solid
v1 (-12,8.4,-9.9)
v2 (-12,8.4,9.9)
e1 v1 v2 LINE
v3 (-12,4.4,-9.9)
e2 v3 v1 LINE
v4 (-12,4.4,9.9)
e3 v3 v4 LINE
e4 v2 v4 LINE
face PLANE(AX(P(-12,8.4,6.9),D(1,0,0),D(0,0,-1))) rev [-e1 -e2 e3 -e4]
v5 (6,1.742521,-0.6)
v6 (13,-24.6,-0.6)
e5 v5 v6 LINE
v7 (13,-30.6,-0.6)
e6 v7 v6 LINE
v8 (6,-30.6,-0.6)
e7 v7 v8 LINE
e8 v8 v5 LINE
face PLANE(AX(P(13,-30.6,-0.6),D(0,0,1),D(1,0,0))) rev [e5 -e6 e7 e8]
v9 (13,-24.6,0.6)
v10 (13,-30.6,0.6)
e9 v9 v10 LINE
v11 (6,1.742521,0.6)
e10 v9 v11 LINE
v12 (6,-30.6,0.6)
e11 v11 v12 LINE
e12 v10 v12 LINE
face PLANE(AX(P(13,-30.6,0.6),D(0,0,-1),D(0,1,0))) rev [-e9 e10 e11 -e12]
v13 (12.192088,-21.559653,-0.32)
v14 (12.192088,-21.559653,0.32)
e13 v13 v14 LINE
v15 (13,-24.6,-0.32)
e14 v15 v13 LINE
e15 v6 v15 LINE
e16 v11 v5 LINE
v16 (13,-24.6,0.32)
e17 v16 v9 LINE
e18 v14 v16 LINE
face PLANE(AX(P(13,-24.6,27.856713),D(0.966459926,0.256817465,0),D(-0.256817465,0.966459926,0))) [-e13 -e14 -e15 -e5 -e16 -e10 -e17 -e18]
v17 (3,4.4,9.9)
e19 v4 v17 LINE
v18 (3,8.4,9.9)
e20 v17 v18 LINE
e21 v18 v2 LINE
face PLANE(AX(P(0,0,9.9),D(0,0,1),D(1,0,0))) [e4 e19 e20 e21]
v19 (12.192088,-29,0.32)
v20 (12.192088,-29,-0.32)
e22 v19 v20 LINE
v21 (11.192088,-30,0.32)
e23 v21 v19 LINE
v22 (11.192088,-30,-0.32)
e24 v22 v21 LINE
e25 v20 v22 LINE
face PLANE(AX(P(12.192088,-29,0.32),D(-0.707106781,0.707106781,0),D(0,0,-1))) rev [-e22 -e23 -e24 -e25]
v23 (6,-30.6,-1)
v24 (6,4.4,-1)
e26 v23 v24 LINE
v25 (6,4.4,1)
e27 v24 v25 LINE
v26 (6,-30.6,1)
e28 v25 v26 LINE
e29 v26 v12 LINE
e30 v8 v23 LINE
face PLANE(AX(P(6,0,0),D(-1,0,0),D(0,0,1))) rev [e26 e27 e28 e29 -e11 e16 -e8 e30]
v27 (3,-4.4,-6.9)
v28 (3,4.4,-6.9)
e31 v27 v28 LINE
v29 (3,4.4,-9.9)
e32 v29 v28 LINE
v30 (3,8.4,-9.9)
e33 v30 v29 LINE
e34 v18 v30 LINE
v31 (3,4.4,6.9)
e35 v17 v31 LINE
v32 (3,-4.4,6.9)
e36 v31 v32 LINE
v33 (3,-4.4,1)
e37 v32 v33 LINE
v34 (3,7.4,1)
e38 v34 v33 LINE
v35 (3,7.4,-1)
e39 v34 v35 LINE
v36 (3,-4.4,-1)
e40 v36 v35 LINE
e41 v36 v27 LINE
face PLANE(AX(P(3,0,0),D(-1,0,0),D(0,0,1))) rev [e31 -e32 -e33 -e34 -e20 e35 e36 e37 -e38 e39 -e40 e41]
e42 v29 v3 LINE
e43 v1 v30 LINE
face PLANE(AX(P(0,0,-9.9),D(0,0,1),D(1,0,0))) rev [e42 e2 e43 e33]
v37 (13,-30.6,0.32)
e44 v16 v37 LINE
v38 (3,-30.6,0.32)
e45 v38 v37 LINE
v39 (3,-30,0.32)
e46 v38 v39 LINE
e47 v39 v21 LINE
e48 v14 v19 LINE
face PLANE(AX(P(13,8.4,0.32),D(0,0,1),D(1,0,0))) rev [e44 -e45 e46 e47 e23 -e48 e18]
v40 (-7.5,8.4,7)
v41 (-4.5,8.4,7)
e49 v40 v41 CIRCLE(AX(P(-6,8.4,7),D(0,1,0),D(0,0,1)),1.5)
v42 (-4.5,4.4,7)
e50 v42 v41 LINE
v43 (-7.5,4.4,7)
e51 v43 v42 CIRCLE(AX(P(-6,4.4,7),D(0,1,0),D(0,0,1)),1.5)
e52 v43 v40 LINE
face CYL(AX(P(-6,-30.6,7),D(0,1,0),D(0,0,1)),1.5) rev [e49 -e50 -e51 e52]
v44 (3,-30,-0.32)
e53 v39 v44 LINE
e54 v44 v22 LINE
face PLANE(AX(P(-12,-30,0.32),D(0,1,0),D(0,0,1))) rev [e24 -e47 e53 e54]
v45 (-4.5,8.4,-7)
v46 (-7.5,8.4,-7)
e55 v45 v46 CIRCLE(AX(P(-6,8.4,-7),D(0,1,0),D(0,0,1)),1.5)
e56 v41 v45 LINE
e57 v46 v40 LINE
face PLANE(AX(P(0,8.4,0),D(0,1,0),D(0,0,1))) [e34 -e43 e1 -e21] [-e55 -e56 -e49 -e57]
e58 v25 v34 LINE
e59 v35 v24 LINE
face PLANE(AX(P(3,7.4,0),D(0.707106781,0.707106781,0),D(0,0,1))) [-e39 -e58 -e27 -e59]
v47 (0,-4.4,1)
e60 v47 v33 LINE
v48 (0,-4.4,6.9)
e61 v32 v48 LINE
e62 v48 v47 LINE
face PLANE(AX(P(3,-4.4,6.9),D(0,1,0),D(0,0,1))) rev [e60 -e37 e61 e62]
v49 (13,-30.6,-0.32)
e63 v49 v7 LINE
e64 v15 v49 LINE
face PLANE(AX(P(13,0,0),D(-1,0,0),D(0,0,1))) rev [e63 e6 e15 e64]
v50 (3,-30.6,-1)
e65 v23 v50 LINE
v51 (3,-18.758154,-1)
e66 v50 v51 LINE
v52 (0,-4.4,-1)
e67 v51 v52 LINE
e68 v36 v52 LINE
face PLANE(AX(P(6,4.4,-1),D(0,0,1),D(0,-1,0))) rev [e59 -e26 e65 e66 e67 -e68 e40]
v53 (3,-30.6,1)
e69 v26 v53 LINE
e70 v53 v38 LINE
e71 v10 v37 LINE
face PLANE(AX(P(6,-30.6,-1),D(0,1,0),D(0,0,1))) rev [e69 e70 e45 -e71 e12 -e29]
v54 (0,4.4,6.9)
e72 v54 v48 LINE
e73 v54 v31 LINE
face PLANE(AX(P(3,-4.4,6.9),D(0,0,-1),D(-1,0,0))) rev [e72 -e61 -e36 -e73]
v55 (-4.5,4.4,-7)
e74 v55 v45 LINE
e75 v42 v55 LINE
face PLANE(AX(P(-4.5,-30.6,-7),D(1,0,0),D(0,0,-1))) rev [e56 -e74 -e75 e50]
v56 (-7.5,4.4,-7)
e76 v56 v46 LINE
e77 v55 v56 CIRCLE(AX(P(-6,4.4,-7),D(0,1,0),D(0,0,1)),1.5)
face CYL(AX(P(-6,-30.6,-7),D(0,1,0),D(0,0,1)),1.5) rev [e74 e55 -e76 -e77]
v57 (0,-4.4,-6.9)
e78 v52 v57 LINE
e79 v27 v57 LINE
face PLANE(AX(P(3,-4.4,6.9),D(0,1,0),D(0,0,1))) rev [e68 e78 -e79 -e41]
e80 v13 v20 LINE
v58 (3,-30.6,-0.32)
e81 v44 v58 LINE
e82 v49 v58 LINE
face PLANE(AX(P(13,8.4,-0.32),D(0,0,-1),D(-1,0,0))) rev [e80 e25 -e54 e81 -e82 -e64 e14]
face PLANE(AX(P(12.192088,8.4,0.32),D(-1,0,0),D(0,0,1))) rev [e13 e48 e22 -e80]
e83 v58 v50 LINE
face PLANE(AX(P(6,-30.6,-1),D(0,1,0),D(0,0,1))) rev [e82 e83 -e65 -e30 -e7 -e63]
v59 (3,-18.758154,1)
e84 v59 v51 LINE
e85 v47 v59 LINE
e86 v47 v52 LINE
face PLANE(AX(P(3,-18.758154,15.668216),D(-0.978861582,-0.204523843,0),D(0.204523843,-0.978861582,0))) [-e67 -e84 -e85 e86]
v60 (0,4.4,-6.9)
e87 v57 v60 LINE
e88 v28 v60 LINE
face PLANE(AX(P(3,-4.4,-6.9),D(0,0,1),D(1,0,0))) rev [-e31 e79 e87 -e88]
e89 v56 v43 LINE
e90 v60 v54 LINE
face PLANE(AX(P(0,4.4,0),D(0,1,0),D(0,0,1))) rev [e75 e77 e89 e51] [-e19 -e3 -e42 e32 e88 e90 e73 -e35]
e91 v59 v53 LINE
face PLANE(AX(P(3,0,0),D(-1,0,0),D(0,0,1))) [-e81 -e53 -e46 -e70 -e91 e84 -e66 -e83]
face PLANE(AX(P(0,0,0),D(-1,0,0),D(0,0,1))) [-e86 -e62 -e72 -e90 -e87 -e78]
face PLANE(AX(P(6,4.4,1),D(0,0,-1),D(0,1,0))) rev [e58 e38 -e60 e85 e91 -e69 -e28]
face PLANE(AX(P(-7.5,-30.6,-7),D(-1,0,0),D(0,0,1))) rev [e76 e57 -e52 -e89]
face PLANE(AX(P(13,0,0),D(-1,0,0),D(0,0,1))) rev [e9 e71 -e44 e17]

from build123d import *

# Parameters (mm, degrees)
SKETCH1_W               = 13.8
SKETCH1_H               = 8.8
BOSS_EXTRUDE1_DEPTH     = 3
SKETCH2_W               = 2
SKETCH2_H               = 35
BOSS_EXTRUDE2_DEPTH     = 3
SKETCH3_W               = 1.2
SKETCH3_H               = 6
BOSS_EXTRUDE3_DEPTH     = 7
FILLET3_R               = 10
SKETCH5_W               = 15
SKETCH5_H               = 13.8
BOSS_EXTRUDE4_DEPTH     = 4
SKETCH6_R               = 1.5
CUT_EXTRUDE4_DEPTH      = 38.968539608
BOSS_EXTRUDE5_DEPTH     = 2
CHAMFER2_SIZE           = 3
BOSS_EXTRUDE7_DEPTH     = 1.2
SKETCH12_W              = 15
SKETCH12_H              = 4
BOSS_EXTRUDE8_DEPTH     = 3
SKETCH13_W              = 15
SKETCH13_H              = 4
BOSS_EXTRUDE9_DEPTH     = 3
CUT_EXTRUDE7_DEPTH      = 43.28486727
CUT_EXTRUDE7_DEPTH_BACK = 43.28486727
CUT_EXTRUDE8_DEPTH      = 43.28486727
CUT_EXTRUDE8_DEPTH_BACK = 43.28486727
SKETCH15_W              = 0.807911756
SKETCH15_H              = 0.64
CUT_EXTRUDE9_DEPTH      = 41.244591358
CUT_EXTRUDE9_DEPTH_BACK = 41.244591358
SKETCH16_W              = 0.64
SKETCH16_H              = 0.6
CHAMFER3_SIZE           = 1


# Some blends are built 0.0001 mm under size
with BuildPart() as part:
    # Sketch1 → Boss-Extrude1 (new body)
    with BuildSketch(Plane(origin=(0, 0, 0), x_dir=(0, 0, -1), z_dir=(1, 0, 0))):
        Rectangle(SKETCH1_W, SKETCH1_H)
    extrude(amount=BOSS_EXTRUDE1_DEPTH)

    # Sketch2 → Boss-Extrude2 (add)
    with BuildSketch(Plane(origin=(3, 0, 0), x_dir=(0, 0, -1), z_dir=(1, 0, 0))):
        with Locations((0, -13.1)):
            Rectangle(SKETCH2_W, SKETCH2_H)
    extrude(amount=BOSS_EXTRUDE2_DEPTH)

    # Sketch3 → Boss-Extrude3 (add)
    with BuildSketch(Plane(origin=(6, 0, 0), x_dir=(0, 0, -1), z_dir=(1, 0, 0))):
        with Locations((0, -27.6)):
            Rectangle(SKETCH3_W, SKETCH3_H)
    extrude(amount=BOSS_EXTRUDE3_DEPTH)

    # Fillet3
    # the kernel refuses this fillet: 10 mm, written as the material it adds along each edge
    with BuildSketch(Plane(origin=(3, -4.4, 1), x_dir=(-1, 0, 0), z_dir=(0, 0, -1))) as fillet3_piece_1:
        with BuildLine():
            CenterArc((10, -7.141428429), FILLET3_R, 134.427004001, 45.572995999)
            Line((0, -7.141428429), (0, 0))
            Line((0, 0), (3, 0))
        make_face()
    extrude(amount=2)

    # Sketch5 → Boss-Extrude4 (add)
    with BuildSketch(Plane(origin=(0, 4.4, 0), x_dir=(1, 0, 0), z_dir=(0, 1, 0))):
        with Locations((-4.5, 0)):
            Rectangle(SKETCH5_W, SKETCH5_H)
    extrude(amount=BOSS_EXTRUDE4_DEPTH)

    # Sketch6 → Cut-Extrude4 (cut, through all)
    with BuildSketch(Plane.XZ.offset(-4.4)):
        with Locations(Location((-6, 3, 0), (0, 0, 270))):
            Circle(SKETCH6_R)
        with Locations(Location((-6, -3, 0), (0, 0, 270))):
            Circle(SKETCH6_R)
    extrude(amount=-CUT_EXTRUDE4_DEPTH, mode=Mode.SUBTRACT)

    # Sketch8 → Boss-Extrude5 (add)
    with BuildSketch(Plane(origin=(0, 0, -1), x_dir=(-1, 0, 0), z_dir=(0, 0, -1))):
        Polygon((-3, -18.758153574), (0, -4.4), (-3, -4.4), align=None)
    extrude(amount=-BOSS_EXTRUDE5_DEPTH)

    # Chamfer2
    chamfer2_edges = [part.edges().sort_by_distance(p)[0] for p in [
        (3, 4.4, 0),
    ]]
    chamfer(chamfer2_edges, length=CHAMFER2_SIZE - 0.0001)  # a hair under: the kernel refuses the full size

    # Sketch11 → Boss-Extrude7 (add)
    with BuildSketch(Plane(origin=(0, 0, -0.6), x_dir=(-1, 0, 0), z_dir=(0, 0, -1))):
        Polygon((-6, -24.6), (-13, -24.6), (-6, 1.742521041), align=None)
    extrude(amount=-BOSS_EXTRUDE7_DEPTH)

    # Sketch12 → Boss-Extrude8 (add)
    with BuildSketch(Plane(origin=(0, 0, -6.9), x_dir=(-1, 0, 0), z_dir=(0, 0, -1))):
        with Locations((4.5, 6.4)):
            Rectangle(SKETCH12_W, SKETCH12_H)
    extrude(amount=BOSS_EXTRUDE8_DEPTH)

    # Sketch13 → Boss-Extrude9 (add)
    with BuildSketch(Plane.XY.offset(6.9)):
        with Locations((-4.5, 6.4)):
            Rectangle(SKETCH13_W, SKETCH13_H)
    extrude(amount=BOSS_EXTRUDE9_DEPTH)

    # Sketch14 → Cut-Extrude7 (cut, two sides: drawn at the far end of the back side and taken through both)
    with BuildSketch(Plane(origin=(0, 8.4, 0), x_dir=(1, 0, 0), z_dir=(0, 1, 0)).offset(-CUT_EXTRUDE7_DEPTH_BACK)):
        with BuildLine():
            Line((-7.5, 7), (-7.5, -7))
            ThreePointArc((-7.5, -7), (-6, -8.5), (-4.5, -7))
            Line((-4.5, -7), (-4.5, 7))
            ThreePointArc((-4.5, 7), (-6, 8.5), (-7.5, 7))
        make_face()
    extrude(amount=CUT_EXTRUDE7_DEPTH + CUT_EXTRUDE7_DEPTH_BACK, mode=Mode.SUBTRACT)

    # Sketch15 → Cut-Extrude8 (cut, two sides: drawn at the far end of the back side and taken through both)
    with BuildSketch(Plane.XZ.offset(30.6).offset(-CUT_EXTRUDE8_DEPTH_BACK)):
        with Locations((12.596044122, 0)):
            Rectangle(SKETCH15_W, SKETCH15_H)
    extrude(amount=CUT_EXTRUDE8_DEPTH + CUT_EXTRUDE8_DEPTH_BACK, mode=Mode.SUBTRACT)

    # Sketch16 → Cut-Extrude9 (cut, two sides: drawn at the far end of the back side and taken through both)
    with BuildSketch(Plane(origin=(12.192088244, 0, 0), x_dir=(0, 0, -1), z_dir=(1, 0, 0)).offset(-CUT_EXTRUDE9_DEPTH_BACK)):
        with Locations((0, -30.3)):
            Rectangle(SKETCH16_W, SKETCH16_H)
    extrude(amount=CUT_EXTRUDE9_DEPTH + CUT_EXTRUDE9_DEPTH_BACK, mode=Mode.SUBTRACT)

    # Chamfer3
    chamfer3_edges = [part.edges().sort_by_distance(p)[0] for p in [
        (12.192088244, -30, 0),
    ]]
    chamfer(chamfer3_edges, length=CHAMFER3_SIZE)


solid = part.part
